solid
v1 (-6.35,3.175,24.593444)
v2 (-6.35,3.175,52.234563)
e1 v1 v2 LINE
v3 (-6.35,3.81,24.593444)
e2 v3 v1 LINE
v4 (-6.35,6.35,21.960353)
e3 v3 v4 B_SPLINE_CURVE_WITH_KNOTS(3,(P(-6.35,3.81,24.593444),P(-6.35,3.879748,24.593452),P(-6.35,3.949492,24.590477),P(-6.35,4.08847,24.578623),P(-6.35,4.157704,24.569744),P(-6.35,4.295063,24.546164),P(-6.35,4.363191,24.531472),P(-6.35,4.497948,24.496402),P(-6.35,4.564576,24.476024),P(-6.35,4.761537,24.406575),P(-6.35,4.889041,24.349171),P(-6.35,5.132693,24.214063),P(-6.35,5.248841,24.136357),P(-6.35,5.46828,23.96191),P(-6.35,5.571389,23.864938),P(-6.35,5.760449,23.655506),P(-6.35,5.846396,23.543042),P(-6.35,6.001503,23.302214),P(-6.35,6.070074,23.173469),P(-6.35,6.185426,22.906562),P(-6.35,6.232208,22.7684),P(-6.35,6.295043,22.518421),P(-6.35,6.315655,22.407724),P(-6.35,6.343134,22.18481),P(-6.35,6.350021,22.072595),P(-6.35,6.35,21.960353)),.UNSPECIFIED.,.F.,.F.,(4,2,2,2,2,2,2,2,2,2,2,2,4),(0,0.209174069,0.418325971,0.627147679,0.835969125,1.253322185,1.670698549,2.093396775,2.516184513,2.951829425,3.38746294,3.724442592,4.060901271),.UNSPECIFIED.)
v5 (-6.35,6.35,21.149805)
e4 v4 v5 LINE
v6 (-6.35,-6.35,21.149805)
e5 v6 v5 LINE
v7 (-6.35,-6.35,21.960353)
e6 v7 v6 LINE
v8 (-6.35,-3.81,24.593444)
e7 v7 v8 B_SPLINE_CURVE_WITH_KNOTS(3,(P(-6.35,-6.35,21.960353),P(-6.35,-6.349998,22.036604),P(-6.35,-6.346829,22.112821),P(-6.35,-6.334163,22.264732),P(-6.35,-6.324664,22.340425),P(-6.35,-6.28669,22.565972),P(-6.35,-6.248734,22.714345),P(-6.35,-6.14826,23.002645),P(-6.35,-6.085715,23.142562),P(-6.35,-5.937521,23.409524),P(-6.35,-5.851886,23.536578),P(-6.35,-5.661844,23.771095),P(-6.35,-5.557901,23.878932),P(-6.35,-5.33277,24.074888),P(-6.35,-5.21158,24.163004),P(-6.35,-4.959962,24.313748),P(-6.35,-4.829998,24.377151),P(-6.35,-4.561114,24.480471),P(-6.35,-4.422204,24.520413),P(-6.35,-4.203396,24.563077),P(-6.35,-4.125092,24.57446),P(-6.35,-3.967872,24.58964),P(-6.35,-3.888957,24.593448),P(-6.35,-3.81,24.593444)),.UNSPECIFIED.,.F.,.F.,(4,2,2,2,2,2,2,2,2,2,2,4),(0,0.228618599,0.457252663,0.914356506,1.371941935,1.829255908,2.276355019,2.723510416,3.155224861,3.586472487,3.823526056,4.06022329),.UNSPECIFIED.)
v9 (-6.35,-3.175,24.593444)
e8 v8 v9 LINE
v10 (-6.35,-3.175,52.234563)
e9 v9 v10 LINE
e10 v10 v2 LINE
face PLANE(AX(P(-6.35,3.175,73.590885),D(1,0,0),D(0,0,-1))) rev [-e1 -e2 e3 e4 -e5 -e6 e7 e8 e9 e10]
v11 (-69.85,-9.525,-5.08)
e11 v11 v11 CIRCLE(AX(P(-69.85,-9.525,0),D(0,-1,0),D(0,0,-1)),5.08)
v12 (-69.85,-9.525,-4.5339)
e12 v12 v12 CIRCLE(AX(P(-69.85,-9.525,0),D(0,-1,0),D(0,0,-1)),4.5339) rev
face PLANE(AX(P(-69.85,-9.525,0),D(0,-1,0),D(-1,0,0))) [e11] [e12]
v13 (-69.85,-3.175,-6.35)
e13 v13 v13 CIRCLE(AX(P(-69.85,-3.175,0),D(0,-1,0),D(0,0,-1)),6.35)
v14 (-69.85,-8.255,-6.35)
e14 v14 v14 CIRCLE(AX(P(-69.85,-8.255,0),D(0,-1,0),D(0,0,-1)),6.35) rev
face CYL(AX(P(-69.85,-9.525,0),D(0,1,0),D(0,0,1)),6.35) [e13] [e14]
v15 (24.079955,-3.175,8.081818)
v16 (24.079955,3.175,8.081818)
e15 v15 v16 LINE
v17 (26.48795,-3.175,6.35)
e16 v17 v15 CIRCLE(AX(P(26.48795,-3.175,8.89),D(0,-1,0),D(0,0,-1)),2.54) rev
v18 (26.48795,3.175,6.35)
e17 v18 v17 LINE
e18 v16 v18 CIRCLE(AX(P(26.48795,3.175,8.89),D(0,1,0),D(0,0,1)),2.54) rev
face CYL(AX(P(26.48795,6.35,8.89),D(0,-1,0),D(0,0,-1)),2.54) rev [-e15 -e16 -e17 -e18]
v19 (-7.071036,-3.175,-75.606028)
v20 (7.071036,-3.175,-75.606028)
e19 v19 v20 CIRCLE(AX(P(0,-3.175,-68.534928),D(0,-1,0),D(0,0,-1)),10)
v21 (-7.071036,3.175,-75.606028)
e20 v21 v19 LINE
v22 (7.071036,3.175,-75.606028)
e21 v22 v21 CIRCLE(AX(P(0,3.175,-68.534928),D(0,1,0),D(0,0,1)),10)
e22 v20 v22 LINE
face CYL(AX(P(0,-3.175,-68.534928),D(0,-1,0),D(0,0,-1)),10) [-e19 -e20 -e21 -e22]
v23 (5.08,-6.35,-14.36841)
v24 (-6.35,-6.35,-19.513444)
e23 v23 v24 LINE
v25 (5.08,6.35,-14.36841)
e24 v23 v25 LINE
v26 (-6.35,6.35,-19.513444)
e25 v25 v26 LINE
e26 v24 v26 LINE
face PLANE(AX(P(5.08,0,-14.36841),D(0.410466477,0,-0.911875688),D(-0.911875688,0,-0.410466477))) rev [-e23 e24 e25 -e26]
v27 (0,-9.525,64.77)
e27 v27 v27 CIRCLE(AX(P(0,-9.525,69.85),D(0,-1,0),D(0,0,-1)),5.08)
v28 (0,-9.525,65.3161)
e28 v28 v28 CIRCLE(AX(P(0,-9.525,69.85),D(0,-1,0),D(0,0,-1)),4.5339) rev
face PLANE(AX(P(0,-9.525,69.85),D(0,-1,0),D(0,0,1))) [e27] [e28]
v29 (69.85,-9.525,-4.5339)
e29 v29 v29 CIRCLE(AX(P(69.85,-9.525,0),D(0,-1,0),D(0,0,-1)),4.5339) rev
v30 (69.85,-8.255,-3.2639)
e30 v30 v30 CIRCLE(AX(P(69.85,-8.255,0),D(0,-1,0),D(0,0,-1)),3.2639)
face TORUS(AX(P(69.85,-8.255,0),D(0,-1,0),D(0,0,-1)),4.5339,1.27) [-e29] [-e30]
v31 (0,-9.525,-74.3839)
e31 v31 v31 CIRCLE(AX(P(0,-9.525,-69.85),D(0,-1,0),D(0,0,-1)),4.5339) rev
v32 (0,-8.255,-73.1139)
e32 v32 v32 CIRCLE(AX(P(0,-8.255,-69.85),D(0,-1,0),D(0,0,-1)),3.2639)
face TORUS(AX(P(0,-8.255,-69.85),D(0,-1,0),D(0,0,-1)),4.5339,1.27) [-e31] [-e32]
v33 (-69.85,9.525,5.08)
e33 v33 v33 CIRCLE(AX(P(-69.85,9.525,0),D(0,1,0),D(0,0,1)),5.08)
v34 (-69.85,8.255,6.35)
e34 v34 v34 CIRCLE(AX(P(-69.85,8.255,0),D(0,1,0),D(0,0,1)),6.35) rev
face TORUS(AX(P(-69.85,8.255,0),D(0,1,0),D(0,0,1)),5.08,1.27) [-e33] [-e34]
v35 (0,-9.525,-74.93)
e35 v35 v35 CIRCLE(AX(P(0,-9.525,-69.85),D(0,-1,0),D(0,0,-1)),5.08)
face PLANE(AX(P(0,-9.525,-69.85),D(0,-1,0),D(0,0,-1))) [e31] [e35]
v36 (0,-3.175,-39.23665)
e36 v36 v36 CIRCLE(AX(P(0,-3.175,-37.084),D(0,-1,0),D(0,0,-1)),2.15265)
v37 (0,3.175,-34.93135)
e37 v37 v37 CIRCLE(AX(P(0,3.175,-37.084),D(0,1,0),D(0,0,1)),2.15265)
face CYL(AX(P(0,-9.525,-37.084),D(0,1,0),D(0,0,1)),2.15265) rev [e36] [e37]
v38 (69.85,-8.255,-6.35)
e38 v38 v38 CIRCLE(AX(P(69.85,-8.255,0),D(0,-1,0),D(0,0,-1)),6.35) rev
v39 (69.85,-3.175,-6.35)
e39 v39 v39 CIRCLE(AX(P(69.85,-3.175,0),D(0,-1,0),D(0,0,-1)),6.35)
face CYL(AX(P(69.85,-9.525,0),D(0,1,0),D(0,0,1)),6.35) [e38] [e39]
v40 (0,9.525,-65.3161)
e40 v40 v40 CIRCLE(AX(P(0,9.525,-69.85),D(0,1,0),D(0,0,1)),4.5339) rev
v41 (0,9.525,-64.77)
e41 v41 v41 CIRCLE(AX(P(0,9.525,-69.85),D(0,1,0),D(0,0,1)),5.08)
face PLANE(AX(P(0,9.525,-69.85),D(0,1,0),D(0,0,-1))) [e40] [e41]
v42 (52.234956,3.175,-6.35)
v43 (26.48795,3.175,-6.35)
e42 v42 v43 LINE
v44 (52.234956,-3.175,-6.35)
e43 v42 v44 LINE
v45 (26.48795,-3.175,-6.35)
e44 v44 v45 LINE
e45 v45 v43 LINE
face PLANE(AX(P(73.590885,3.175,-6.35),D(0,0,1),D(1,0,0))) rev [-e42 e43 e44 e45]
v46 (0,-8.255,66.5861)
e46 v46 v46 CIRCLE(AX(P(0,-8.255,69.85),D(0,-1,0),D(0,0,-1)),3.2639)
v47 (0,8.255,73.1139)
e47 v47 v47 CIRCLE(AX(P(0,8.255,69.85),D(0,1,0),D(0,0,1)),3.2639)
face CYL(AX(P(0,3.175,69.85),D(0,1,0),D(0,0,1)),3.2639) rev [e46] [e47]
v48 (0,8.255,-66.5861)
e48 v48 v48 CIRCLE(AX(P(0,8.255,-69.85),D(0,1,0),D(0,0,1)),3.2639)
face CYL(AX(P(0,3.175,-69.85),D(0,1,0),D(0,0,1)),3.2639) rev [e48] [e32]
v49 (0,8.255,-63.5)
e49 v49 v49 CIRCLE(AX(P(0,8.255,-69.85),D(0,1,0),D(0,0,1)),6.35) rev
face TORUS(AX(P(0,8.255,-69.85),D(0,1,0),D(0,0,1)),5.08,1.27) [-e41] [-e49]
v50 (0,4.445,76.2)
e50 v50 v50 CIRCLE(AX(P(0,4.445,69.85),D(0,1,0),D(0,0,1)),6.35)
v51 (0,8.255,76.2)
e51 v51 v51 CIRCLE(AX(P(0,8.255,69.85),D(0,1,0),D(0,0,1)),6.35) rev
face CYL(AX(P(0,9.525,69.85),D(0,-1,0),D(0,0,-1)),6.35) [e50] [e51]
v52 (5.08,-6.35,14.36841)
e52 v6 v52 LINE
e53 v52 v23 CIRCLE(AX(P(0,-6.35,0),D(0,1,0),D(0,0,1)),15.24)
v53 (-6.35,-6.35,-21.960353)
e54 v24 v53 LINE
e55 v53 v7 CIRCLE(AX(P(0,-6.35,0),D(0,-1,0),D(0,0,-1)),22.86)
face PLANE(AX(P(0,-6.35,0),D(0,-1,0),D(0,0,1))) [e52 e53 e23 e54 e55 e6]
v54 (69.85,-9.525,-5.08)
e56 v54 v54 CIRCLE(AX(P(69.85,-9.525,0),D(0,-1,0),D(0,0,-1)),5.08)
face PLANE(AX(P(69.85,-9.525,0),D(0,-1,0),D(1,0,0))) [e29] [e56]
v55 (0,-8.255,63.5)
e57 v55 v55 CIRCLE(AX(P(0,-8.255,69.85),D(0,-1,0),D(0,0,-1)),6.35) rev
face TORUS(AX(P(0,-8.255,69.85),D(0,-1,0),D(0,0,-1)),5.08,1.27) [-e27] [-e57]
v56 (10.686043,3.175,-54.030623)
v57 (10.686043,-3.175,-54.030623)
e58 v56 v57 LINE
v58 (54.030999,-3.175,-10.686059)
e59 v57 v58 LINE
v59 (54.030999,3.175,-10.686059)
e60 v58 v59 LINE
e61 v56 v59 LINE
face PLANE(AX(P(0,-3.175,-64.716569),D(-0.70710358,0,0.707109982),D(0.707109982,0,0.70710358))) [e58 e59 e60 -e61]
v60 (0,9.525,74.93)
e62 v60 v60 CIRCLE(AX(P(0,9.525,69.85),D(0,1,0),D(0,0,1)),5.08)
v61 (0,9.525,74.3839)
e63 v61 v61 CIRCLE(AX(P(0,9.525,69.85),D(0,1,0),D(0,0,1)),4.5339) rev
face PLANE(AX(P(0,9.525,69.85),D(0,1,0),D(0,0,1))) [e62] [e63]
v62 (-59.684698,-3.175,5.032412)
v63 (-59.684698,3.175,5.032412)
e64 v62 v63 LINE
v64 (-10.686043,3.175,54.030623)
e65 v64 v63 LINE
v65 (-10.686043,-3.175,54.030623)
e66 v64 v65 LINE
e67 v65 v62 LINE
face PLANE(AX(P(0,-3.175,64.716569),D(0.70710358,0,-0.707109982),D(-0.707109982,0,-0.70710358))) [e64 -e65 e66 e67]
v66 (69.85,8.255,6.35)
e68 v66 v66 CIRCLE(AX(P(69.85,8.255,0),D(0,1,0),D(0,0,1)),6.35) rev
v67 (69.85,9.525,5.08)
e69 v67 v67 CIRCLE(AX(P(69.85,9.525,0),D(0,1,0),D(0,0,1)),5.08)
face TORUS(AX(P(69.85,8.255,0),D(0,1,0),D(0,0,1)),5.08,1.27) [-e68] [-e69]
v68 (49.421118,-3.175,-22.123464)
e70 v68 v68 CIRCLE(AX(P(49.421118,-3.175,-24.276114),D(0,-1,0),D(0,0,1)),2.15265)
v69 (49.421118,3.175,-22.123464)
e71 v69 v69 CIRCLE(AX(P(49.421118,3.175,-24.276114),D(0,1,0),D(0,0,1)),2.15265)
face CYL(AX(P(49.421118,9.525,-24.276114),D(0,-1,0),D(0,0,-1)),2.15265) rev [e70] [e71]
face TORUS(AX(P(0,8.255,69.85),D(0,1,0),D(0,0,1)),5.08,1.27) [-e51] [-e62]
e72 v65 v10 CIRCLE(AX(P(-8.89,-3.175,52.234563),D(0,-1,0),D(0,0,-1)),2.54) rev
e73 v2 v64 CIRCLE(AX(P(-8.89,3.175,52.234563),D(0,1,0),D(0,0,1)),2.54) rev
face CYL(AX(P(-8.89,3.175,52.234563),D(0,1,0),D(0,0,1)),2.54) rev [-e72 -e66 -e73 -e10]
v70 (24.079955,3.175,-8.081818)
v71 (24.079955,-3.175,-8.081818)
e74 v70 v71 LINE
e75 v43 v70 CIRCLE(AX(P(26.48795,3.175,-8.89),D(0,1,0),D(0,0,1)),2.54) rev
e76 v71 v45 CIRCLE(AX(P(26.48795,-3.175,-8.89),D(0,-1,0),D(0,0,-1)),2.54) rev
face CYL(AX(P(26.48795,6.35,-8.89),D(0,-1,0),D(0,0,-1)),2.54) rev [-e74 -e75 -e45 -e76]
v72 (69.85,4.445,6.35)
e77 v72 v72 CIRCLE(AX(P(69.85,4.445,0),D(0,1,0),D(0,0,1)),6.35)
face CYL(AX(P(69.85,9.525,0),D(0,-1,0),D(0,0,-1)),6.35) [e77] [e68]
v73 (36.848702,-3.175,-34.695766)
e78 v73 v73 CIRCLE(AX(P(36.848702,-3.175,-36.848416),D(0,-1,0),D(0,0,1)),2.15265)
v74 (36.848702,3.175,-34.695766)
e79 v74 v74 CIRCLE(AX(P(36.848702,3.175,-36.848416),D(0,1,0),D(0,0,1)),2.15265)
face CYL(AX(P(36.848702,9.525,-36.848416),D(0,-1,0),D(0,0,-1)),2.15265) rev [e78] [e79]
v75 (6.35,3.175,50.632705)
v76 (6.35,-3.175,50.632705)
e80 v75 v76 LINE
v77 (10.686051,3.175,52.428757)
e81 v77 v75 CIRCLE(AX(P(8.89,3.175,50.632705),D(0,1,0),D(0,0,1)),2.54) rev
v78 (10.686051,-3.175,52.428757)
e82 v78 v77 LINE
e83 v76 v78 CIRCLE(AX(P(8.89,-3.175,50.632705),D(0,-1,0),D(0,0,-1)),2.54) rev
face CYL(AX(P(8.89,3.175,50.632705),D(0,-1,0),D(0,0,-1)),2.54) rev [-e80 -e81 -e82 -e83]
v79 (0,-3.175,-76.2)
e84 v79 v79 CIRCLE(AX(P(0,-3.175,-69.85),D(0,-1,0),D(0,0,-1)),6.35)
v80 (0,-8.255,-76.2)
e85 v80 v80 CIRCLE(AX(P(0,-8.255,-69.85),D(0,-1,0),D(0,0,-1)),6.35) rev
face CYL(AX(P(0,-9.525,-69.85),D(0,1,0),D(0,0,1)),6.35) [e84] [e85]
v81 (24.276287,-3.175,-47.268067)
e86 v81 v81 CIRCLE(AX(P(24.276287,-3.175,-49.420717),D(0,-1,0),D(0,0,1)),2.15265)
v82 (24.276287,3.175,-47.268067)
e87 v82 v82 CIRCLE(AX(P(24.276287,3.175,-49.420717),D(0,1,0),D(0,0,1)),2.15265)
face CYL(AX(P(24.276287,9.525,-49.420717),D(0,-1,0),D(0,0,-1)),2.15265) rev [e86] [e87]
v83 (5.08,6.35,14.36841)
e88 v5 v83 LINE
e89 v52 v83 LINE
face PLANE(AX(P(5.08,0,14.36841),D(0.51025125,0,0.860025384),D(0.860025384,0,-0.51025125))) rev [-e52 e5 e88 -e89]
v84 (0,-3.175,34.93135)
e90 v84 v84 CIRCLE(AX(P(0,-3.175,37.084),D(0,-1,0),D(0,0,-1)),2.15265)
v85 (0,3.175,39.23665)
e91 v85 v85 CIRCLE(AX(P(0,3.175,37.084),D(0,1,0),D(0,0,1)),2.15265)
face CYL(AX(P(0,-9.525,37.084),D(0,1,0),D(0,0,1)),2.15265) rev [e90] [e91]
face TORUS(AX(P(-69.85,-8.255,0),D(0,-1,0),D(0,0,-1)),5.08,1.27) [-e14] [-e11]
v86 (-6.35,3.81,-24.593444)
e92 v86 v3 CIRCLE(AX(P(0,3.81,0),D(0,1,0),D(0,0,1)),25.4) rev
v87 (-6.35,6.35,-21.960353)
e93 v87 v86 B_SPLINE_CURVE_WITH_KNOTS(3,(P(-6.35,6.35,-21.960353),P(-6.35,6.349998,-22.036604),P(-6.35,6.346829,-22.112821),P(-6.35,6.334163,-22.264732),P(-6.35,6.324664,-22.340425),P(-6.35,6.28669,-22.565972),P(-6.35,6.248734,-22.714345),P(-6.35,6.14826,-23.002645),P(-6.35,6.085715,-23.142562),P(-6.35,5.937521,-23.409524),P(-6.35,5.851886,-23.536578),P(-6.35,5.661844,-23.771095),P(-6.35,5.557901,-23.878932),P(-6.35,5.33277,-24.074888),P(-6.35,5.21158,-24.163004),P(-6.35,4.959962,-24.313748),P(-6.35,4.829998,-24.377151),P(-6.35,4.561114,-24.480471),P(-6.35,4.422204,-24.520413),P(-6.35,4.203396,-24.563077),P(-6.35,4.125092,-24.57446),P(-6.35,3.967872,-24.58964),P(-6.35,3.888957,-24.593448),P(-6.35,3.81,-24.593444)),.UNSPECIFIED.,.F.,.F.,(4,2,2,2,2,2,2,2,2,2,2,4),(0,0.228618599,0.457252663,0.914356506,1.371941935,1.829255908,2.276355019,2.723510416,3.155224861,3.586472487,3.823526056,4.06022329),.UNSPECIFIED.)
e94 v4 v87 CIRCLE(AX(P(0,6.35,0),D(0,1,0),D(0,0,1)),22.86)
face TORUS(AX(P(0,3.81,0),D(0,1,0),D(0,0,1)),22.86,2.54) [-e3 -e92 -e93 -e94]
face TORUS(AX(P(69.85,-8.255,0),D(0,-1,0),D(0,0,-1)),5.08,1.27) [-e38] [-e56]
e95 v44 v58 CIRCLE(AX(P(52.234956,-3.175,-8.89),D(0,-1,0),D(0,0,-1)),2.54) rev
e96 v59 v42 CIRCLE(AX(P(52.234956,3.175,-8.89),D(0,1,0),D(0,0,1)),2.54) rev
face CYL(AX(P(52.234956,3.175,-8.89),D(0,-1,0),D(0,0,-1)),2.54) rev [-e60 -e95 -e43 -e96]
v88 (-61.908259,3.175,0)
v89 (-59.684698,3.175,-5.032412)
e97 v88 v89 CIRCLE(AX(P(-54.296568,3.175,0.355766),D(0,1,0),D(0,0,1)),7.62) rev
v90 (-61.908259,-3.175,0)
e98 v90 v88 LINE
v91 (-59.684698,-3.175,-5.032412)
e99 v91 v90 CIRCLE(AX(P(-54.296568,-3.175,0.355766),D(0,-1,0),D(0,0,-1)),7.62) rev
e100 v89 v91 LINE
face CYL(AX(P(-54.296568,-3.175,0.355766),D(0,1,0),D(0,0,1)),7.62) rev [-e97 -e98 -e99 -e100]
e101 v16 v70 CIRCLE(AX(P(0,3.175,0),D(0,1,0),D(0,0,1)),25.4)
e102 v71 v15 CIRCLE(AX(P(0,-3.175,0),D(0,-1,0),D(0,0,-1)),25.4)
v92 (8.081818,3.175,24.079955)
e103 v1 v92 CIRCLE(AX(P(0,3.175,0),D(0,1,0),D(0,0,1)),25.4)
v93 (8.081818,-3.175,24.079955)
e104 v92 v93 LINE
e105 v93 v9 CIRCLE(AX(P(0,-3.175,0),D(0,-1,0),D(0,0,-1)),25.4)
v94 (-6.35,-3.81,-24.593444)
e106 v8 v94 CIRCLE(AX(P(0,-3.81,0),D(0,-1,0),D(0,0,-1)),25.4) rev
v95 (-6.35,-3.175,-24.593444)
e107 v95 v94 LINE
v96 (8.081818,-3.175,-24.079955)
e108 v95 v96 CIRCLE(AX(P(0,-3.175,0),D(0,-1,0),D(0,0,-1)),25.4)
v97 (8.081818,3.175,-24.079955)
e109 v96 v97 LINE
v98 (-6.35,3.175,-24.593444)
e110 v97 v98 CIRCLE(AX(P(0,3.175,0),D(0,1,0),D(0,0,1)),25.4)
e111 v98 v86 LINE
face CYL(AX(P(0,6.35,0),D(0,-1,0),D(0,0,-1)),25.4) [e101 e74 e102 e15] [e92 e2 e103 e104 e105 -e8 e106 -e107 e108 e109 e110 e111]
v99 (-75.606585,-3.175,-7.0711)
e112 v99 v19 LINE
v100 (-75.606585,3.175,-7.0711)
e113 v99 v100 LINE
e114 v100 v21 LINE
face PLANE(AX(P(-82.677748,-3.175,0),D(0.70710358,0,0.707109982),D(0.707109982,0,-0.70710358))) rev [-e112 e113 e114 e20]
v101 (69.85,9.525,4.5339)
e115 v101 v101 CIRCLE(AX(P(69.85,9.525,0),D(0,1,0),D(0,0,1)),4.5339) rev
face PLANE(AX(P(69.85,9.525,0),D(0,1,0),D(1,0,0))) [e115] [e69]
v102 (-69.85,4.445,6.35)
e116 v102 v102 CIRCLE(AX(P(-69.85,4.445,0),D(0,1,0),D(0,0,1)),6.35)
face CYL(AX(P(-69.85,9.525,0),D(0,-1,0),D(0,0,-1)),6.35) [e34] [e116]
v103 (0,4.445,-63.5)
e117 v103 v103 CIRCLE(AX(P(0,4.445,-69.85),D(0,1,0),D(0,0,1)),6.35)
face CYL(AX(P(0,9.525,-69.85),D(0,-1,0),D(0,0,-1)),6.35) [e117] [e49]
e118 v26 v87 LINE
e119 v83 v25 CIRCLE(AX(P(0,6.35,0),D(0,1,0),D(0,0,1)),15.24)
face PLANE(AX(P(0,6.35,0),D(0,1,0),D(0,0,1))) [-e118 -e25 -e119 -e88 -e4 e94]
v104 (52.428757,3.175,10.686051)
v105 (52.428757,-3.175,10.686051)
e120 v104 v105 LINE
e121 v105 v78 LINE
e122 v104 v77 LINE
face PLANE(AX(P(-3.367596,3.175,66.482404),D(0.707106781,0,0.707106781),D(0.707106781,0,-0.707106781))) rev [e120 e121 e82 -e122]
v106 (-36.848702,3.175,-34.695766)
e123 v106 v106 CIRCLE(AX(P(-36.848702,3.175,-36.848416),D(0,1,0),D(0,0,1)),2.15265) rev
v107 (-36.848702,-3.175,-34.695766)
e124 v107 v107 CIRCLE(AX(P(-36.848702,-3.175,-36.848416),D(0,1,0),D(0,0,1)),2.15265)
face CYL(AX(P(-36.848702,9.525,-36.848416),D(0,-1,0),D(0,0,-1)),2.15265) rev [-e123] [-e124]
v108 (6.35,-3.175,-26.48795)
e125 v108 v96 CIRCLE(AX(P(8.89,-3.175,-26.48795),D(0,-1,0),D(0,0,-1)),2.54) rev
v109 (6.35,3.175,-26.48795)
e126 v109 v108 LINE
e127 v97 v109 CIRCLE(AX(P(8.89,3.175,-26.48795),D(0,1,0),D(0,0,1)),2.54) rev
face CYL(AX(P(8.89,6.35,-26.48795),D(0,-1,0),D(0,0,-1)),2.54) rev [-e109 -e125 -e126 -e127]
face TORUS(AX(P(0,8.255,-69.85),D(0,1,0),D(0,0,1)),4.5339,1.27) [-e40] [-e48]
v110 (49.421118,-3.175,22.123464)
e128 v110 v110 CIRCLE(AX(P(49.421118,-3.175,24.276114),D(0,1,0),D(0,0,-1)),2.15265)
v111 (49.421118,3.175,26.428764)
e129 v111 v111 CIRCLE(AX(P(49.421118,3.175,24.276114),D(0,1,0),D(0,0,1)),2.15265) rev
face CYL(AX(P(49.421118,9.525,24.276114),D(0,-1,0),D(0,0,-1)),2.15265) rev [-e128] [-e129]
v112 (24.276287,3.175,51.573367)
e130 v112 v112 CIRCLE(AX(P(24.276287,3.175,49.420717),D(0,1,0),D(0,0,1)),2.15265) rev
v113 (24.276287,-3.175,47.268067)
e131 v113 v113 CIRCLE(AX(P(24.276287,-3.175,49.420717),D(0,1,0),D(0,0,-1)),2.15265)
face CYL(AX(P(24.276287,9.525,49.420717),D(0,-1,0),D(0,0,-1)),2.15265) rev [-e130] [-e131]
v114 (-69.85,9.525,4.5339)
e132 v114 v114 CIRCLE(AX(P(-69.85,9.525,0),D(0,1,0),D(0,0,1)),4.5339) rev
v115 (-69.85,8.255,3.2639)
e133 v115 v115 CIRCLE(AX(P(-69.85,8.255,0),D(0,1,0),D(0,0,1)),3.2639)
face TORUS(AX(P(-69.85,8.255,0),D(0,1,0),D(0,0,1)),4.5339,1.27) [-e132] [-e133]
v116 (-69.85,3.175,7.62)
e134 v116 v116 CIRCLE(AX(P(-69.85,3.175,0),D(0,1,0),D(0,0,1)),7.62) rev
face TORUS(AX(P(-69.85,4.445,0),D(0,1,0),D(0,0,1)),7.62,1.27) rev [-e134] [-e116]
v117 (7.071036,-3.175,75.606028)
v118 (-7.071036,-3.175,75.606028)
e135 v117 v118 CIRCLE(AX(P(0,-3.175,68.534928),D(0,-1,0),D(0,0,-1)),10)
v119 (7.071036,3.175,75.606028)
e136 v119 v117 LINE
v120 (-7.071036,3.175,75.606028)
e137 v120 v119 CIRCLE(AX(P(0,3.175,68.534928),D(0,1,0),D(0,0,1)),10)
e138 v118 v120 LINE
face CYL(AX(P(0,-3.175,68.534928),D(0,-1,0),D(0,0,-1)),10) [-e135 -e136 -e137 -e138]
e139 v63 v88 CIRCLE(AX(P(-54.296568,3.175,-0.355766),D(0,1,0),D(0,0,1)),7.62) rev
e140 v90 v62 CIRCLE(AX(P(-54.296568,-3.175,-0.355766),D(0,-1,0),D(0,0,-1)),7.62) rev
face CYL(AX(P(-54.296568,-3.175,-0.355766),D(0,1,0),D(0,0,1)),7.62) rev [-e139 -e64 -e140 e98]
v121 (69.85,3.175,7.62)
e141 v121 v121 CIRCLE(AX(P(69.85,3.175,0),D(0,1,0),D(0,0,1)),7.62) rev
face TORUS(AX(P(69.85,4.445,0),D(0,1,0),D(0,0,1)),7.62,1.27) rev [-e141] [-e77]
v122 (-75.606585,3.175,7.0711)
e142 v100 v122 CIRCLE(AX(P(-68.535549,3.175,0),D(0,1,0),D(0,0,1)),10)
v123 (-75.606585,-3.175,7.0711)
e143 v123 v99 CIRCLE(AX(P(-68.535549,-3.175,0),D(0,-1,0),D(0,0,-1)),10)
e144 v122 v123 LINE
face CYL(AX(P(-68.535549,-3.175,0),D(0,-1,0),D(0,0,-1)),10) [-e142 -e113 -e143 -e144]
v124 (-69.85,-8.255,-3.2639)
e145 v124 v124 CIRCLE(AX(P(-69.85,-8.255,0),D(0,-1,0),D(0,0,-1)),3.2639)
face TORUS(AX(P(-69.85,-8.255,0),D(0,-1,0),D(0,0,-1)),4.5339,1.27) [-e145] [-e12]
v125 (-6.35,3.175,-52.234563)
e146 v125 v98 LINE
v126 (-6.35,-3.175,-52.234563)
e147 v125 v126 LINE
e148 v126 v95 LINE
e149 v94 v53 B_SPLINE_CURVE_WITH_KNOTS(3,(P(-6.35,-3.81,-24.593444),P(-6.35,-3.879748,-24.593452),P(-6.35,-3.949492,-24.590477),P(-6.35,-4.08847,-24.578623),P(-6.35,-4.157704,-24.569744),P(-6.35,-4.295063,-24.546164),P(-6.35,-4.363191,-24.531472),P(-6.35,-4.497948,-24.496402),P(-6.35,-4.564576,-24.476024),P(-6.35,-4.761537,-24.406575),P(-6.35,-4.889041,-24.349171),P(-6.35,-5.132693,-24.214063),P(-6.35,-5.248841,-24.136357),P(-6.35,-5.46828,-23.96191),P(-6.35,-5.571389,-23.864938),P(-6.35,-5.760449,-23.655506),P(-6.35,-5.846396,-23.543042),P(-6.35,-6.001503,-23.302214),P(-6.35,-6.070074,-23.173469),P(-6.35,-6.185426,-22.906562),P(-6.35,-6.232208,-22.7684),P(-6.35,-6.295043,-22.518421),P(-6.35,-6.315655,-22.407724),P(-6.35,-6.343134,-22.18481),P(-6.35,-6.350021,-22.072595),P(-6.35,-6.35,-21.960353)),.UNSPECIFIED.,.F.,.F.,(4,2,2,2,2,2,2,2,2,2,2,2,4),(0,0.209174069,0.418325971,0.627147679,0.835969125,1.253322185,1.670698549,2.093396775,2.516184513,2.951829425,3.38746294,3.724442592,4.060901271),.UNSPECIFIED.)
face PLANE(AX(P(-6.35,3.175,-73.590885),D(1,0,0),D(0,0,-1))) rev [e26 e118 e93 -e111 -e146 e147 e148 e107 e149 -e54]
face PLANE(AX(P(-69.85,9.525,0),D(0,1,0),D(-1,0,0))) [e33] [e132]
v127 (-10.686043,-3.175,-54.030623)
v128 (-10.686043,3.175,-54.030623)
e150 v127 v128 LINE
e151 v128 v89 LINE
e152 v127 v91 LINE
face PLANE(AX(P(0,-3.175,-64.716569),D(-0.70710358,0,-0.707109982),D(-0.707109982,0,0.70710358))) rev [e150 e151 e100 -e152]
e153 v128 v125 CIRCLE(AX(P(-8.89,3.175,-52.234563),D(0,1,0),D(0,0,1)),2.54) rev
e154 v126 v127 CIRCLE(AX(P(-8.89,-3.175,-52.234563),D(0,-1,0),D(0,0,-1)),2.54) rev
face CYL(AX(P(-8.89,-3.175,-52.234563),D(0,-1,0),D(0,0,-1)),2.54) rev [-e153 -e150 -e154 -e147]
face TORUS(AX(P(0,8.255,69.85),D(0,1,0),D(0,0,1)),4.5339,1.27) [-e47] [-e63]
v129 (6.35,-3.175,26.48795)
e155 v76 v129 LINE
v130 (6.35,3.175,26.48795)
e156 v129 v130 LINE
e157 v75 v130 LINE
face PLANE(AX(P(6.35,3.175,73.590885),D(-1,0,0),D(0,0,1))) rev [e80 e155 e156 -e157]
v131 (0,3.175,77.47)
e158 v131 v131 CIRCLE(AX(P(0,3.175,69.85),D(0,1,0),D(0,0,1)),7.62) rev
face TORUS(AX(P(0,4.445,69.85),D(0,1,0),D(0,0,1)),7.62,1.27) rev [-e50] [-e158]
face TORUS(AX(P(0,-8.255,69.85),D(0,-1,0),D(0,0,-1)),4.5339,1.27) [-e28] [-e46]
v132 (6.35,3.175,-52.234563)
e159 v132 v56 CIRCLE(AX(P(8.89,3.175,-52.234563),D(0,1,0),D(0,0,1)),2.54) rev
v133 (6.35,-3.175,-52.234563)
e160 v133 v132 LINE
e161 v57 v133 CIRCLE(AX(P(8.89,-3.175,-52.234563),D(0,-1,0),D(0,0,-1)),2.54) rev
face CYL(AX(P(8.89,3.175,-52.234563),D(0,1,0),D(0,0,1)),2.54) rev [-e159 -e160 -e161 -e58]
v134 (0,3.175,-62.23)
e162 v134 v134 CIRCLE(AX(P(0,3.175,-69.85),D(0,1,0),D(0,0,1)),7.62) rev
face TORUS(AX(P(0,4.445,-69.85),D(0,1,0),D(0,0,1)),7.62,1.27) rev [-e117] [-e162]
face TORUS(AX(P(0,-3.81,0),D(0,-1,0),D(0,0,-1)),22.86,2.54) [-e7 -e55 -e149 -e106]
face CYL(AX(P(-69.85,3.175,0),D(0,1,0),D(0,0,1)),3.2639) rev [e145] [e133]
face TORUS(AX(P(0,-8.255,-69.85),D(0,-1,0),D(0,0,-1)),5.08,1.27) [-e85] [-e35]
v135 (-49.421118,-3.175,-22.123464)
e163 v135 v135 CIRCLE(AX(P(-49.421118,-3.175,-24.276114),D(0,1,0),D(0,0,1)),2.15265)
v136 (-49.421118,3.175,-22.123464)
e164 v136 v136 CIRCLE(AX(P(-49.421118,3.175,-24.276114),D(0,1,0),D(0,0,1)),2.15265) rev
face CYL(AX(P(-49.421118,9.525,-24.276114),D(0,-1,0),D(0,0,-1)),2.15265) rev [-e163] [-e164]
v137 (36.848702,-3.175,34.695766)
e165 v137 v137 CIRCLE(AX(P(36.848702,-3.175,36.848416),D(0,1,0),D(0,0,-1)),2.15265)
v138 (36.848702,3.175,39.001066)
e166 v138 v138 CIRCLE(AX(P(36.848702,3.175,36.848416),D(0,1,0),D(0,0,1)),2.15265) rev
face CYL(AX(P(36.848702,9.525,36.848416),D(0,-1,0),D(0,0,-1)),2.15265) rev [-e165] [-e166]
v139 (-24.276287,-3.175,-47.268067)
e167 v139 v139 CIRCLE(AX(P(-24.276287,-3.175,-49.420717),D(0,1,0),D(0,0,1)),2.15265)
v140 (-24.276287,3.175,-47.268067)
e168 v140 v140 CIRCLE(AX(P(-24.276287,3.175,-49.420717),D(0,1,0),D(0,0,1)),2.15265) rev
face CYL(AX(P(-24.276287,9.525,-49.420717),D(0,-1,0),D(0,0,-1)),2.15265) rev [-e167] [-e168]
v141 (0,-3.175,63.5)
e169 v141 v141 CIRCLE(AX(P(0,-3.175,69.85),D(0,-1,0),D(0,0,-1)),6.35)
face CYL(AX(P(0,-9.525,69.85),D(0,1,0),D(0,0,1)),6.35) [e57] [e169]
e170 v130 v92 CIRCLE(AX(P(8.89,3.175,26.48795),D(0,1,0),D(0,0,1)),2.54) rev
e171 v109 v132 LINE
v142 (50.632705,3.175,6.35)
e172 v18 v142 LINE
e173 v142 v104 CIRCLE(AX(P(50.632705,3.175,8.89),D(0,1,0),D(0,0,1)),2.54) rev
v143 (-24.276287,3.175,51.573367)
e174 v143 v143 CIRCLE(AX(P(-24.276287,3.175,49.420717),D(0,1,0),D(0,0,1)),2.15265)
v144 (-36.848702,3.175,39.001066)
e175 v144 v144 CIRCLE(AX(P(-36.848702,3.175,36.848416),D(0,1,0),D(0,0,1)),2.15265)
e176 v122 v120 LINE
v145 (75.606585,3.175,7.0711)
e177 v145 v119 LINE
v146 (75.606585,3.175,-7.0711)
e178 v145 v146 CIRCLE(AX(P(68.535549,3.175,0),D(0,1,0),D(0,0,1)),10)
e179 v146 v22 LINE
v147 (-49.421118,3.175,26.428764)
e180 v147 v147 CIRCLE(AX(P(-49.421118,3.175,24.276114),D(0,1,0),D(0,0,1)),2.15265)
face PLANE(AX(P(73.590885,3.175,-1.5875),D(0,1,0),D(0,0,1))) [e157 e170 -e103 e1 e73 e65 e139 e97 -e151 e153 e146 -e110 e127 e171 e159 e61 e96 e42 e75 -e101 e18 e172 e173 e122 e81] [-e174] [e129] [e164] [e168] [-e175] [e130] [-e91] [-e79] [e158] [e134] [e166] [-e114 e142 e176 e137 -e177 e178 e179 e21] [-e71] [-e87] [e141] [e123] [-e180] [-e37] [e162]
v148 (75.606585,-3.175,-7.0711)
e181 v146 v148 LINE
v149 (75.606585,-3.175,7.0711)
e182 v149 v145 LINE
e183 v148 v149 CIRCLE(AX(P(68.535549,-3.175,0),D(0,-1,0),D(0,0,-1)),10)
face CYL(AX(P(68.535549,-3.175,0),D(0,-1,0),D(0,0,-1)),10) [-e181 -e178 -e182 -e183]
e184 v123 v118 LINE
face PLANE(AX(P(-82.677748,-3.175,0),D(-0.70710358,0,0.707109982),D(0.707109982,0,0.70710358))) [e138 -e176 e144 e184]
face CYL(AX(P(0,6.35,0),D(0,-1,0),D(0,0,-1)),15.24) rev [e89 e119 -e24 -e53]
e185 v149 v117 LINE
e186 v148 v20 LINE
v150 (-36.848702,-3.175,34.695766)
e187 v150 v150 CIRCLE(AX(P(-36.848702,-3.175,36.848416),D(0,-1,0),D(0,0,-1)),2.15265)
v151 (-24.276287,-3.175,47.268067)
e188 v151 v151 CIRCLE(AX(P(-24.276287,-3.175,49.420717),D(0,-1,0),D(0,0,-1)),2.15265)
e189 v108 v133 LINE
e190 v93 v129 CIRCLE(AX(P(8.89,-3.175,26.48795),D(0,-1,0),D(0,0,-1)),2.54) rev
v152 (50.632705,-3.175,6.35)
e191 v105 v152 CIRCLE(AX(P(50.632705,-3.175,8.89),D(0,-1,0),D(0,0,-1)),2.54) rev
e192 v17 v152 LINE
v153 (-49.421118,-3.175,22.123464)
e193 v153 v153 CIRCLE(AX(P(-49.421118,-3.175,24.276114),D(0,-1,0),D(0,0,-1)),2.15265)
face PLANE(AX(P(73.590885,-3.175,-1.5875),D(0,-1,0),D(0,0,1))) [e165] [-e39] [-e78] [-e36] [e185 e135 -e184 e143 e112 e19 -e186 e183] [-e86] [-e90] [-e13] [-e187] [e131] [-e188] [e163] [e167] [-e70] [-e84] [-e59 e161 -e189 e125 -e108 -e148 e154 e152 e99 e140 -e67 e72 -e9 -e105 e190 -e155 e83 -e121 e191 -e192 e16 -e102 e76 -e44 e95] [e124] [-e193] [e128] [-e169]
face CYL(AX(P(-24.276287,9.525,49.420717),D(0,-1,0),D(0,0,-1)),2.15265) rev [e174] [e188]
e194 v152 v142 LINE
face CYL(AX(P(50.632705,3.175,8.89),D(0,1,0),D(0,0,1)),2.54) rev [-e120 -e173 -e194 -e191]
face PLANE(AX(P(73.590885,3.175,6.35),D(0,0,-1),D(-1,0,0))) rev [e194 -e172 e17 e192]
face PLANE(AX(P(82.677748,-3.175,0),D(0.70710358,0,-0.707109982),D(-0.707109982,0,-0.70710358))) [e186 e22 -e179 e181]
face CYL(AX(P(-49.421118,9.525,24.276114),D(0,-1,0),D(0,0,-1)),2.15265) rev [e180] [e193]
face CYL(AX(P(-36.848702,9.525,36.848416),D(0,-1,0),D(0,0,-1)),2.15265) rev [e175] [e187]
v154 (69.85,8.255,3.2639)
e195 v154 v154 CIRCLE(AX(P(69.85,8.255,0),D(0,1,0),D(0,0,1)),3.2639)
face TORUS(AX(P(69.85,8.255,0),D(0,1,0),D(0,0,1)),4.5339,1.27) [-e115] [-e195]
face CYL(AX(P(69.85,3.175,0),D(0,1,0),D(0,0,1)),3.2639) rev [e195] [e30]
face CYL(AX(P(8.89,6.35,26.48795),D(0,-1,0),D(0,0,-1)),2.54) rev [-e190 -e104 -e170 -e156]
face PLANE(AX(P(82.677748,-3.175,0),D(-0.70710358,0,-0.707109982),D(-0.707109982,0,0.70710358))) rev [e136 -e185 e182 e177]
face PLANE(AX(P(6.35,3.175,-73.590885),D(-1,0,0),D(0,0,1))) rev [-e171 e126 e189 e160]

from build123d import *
from build123d.topology import SkipClean

# Parameters (mm, degrees)
SKETCH1_R                                  = 25.4
SKETCH1_R_2                                = 15.24
BOSS_EXTRUDE1_DEPTH                        = 6.35
BOSS_EXTRUDE2_START                        = -6.35
BOSS_EXTRUDE2_DEPTH                        = 3.175
CIRPATTERN1_COUNT                          = 4
CUT_EXTRUDE1_DEPTH                         = 111.990216985
BOSS_EXTRUDE5_DEPTH                        = 3.175
MIRROR1_START                              = -3.175
MIRROR1_DEPTH                              = 3.175
MIRROR1_START_2                            = -6.35
MIRROR1_2_DEPTH                            = 3.175
FILLET4_R                                  = 2.54
BOSS_EXTRUDE7_DEPTH                        = 6.35
SKETCH16_R                                 = 7.9375
BOSS_EXTRUDE8_DEPTH                        = 6.35
MIRROR5_AT_THE_SECOND_PLANE_COPY_1_DEPTH   = 6.35
BOSS_EXTRUDE10_START                       = 6.35
SKETCH20_R                                 = 6.35
SKETCH20_R_2                               = 3.2639
BOSS_EXTRUDE10_DEPTH                       = 6.35
CIRPATTERN5_COUNT                          = 4
FILLET6_R                                  = 10
FILLET7_R                                  = 2.54
SKETCH18_R                                 = 2.15265
CUT_EXTRUDE4_DEPTH                         = 112.789343907
MIRROR6_AT_THE_SECOND_PLANE_COPY_1_SKETC_R = 2.15265
MIRROR6_AT_THE_SECOND_PLANE_COPY_1_DEPTH   = 112.789343907
FILLET8_R                                  = 2.54
FILLET10_R                                 = 7.62
FILLET11_R                                 = 1.27
CIRPATTERN7_COUNT                          = 4
FILLET11_OF_CIRPATTERN7_R                  = 1.27
SKETCH21_R                                 = 2.15265
CUT_EXTRUDE5_DEPTH                         = 112.789343907


# Read off the part's stored shape, not the designer's step: Mirror1, Mirror8
with BuildPart() as part:
    # Sketch1 → Boss-Extrude1 (new body)
    with BuildSketch(Plane(origin=(0, 0, 0), x_dir=(1, 0, 0), z_dir=(0, 1, 0))):
        with Locations(Location((0, 0, 0), (0, 0, 270))):
            Circle(SKETCH1_R)
        with Locations(Location((0, 0, 0), (0, 0, 270))):
            Circle(SKETCH1_R_2, mode=Mode.SUBTRACT)
    extrude(amount=BOSS_EXTRUDE1_DEPTH)

    # Sketch2 → Boss-Extrude2 (add)
    with BuildSketch(Plane(origin=(0, 6.35, 0), x_dir=(1, 0, 0), z_dir=(0, 1, 0)).offset(BOSS_EXTRUDE2_START)):
        with BuildLine():
            Line((73.590884631, -6.35), (16.699754169, -6.35))
            Line((16.699754169, -6.35), (16.699754169, 6.35))
            Line((16.699754169, 6.35), (73.590884631, 6.35))
            ThreePointArc((73.590884631, 6.35), (76.958480677, 4.955096045), (78.353384631, 1.5875))
            Line((78.353384631, 1.5875), (78.353384631, -1.5875))
            ThreePointArc((78.353384631, -1.5875), (76.958480677, -4.955096045), (73.590884631, -6.35))
        make_face()
    boss_extrude2 = extrude(amount=BOSS_EXTRUDE2_DEPTH)

    # CirPattern1: Boss-Extrude2 ×4 about axis
    cirpattern1_axis = Axis((0, 0, 0), (0, 1, 0))
    for i in range(1, CIRPATTERN1_COUNT):
        add(boss_extrude2.rotate(cirpattern1_axis, i * 360 / CIRPATTERN1_COUNT))

    # Sketch5 → Cut-Extrude1 (cut, through all)
    with BuildSketch(Plane(origin=(0, 6.35, 0), x_dir=(1, 0, 0), z_dir=(0, 1, 0))):
        Polygon((-6.35, 19.513444248), (-6.35, 24.593444248), (-6.35, 52.536571615), (-88.152777481, 52.536571615), (-88.152777481, -52.536571615), (-6.35, -52.536571615), (-6.35, -26.229804731), (-6.35, -21.149804731), (5.08, -14.368409794), (5.08, 14.368409794), align=None)
    extrude(amount=-CUT_EXTRUDE1_DEPTH, mode=Mode.SUBTRACT)

    # Sketch12 → Boss-Extrude5 (add)
    with BuildSketch(Plane(origin=(0, 0, 0), x_dir=(1, 0, 0), z_dir=(0, 1, 0))):
        with BuildLine():
            Line((-3.367596045, -66.482403955), (66.482403955, 3.367596045))
            ThreePointArc((66.482403955, 3.367596045), (73.217596045, 3.367596045), (73.217596045, -3.367596045))
            Line((73.217596045, -3.367596045), (3.367596045, -73.217596045))
            ThreePointArc((3.367596045, -73.217596045), (-3.367596045, -73.217596045), (-3.367596045, -66.482403955))
        make_face()
    extrude(amount=BOSS_EXTRUDE5_DEPTH)

    # Mirror1 outline → Mirror1 (add)
    with BuildSketch(Plane(origin=(0, 0, 0), x_dir=(1, 0, 0), z_dir=(0, 1, 0)).offset(MIRROR1_START)):
        with BuildLine():
            Line((73.590884631, 6.35), (24.593444248, 6.35))
            ThreePointArc((24.593444248, 6.35), (17.960512242, 17.960512242), (6.35, 24.593444248))
            Line((6.35, 24.593444248), (6.35, 73.590884631))
            ThreePointArc((6.35, 73.590884631), (4.955096046, 76.958480677), (1.5875, 78.353384631))
            Line((1.5875, 78.353384631), (-1.5875, 78.353384631))
            ThreePointArc((-1.5875, 78.353384631), (-4.955096046, 76.958480677), (-6.35, 73.590884631))
            Line((-6.35, 73.590884631), (-6.35, 19.513444248))
            Line((-6.35, 19.513444248), (5.08, 14.368409794))
            ThreePointArc((5.08, 14.368409794), (15.24, 0), (5.08, -14.368409794))
            Line((5.08, -14.368409794), (-6.35, -21.149804731))
            Line((-6.35, -21.149804731), (-6.35, -73.590884631))
            ThreePointArc((-6.35, -73.590884631), (-4.955096046, -76.958480677), (-1.5875, -78.353384631))
            Line((-1.5875, -78.353384631), (1.5875, -78.353384631))
            ThreePointArc((1.5875, -78.353384631), (4.955096046, -76.958480677), (6.35, -73.590884631))
            Line((6.35, -73.590884631), (6.35, -70.235192091))
            Line((6.35, -70.235192091), (70.235192091, -6.35))
            Line((70.235192091, -6.35), (73.590884631, -6.35))
            ThreePointArc((73.590884631, -6.35), (76.958480677, -4.955096046), (78.353384631, -1.5875))
            Line((78.353384631, -1.5875), (78.353384631, 1.5875))
            ThreePointArc((78.353384631, 1.5875), (76.958480677, 4.955096046), (73.590884631, 6.35))
        make_face()
        with BuildLine():
            Line((24.593444248, -6.35), (56.764807909, -6.35))
            Line((56.764807909, -6.35), (6.35, -56.764807909))
            Line((6.35, -56.764807909), (6.35, -24.593444248))
            ThreePointArc((6.35, -24.593444248), (17.960512242, -17.960512242), (24.593444248, -6.35))
        make_face(mode=Mode.SUBTRACT)
    extrude(amount=MIRROR1_DEPTH)

    # Mirror1 2 outline → Mirror1 2 (add)
    with BuildSketch(Plane(origin=(0, 0, 0), x_dir=(1, 0, 0), z_dir=(0, 1, 0)).offset(MIRROR1_START_2)):
        with BuildLine():
            ThreePointArc((-6.35, -24.593444248), (25.4, 0), (-6.35, 24.593444248))
            Line((-6.35, 24.593444248), (-6.35, 19.513444248))
            Line((-6.35, 19.513444248), (5.08, 14.368409794))
            ThreePointArc((5.08, 14.368409794), (15.24, 0), (5.08, -14.368409794))
            Line((5.08, -14.368409794), (-6.35, -21.149804731))
            Line((-6.35, -21.149804731), (-6.35, -24.593444248))
        make_face()
    extrude(amount=MIRROR1_2_DEPTH)

    # Fillet4
    # the kernel refuses this fillet: 2.54 mm, written as the material it adds along each edge
    with BuildSketch(Plane(origin=(24.593444248, 3.175, -6.35), x_dir=(1, 0, 0), z_dir=(0, -1, 0)), Plane(origin=(6.35, 3.175, 24.593444248), x_dir=(0, 0, 1), z_dir=(0, -1, 0)), Plane(origin=(6.35, -3.175, -24.593444248), x_dir=(0, 0, -1), z_dir=(0, 1, 0))) as fillet4_piece_1:
        with BuildLine():
            CenterArc((1.894505842, -2.54), FILLET4_R, 90, 71.446995465)
            ThreePointArc((-0.513489621, -1.731818182), (-0.241344994, -0.870475186), (0, 0))
            Line((0, 0), (1.894505842, 0))
        make_face()
    extrude(amount=3.175)
    with BuildSketch(Plane(origin=(24.593444248, 3.175, 6.35), x_dir=(1, 0, 0), z_dir=(0, -1, 0)), Plane(origin=(6.35, 3.175, -24.593444248), x_dir=(0, 0, -1), z_dir=(0, -1, 0))) as fillet4_piece_2:
        with BuildLine():
            CenterArc((1.894505842, 2.54), FILLET4_R, 198.553004535, 71.446995465)
            ThreePointArc((-0.513489621, 1.731818182), (-0.241344994, 0.870475186), (0, 0))
            Line((0, 0), (1.894505842, 0))
        make_face()
    extrude(amount=3.175)
    with BuildSketch(Plane(origin=(6.35, -3.175, 24.593444248), x_dir=(0.9587440651387001, 0, -0.2842706765766038), z_dir=(0, 1, 0)), Plane(origin=(24.593444248, -3.175, -6.35), x_dir=(-0.2842706765766039, 0, -0.9587440651387), z_dir=(0, 1, 0))) as fillet4_piece_3:
        with BuildLine():
            CenterArc((1.896657468, -2.538393751), FILLET4_R, 92.037746175, 71.446995466)
            Line((-0.538552458, -1.816346233), (0, 0))
            ThreePointArc((0, 0), (0.903170223, -0.016062489), (1.806340446, 0))
        make_face()
    extrude(amount=3.175)
    with BuildSketch(Plane(origin=(24.593444248, -3.175, 6.35), x_dir=(-0.2842706765766016, 0, 0.9587440651387007), z_dir=(0, 1, 0))) as fillet4_piece_4:
        with BuildLine():
            CenterArc((1.896657468, 2.538393751), FILLET4_R, 196.515258359, 71.446995466)
            Line((-0.538552458, 1.816346233), (0, 0))
            ThreePointArc((0, 0), (0.903170223, 0.016062489), (1.806340446, 0))
        make_face()
    extrude(amount=3.175)

    # Sketch15 → Boss-Extrude7 (add)
    with SkipClean():  # the faces are left unmerged after this step: merging them gives an invalid solid
        with BuildSketch(Plane(origin=(0, 3.175, 0), x_dir=(1, 0, 0), z_dir=(0, 1, 0))):
            Polygon((-82.677748493, 0), (0, -82.677), (0, -64.716569057), (-64.71715495, 0), align=None)
        boss_extrude7 = extrude(amount=-BOSS_EXTRUDE7_DEPTH)

    # Sketch16 → Boss-Extrude8 (add)
    with SkipClean():  # the faces are left unmerged after this step: merging them gives an invalid solid
        with BuildSketch(Plane(origin=(0, 3.175, 0), x_dir=(1, 0, 0), z_dir=(0, 1, 0))):
            with Locations((-69.85, 0)):
                Circle(SKETCH16_R)
        extrude(amount=-BOSS_EXTRUDE8_DEPTH)

    # Mirror5: Boss-Extrude7 across plane
    with SkipClean():  # the faces are left unmerged after this step: merging them gives an invalid solid
        add(boss_extrude7.mirror(Plane(origin=(0, 0, 0), x_dir=(0, 0, 1), z_dir=(1, 0, 0))))

    # Mirror5 at the second plane: Boss-Extrude7 across plane
    with SkipClean():  # the faces are left unmerged after this step: merging them gives an invalid solid
        add(boss_extrude7.mirror(Plane.XY))

    # Mirror5 at the second plane copy 1 sketc → Mirror5 at the second plane copy 1 (add)
    with SkipClean():  # the faces are left unmerged after this step: merging them gives an invalid solid
        with BuildSketch(Plane(origin=(0, 3.175, 0), x_dir=(-1, 0, 0), z_dir=(0, 1, 0))):
            Polygon((-82.677748493, 0), (0, -82.677), (0, -64.716569057), (-64.71715495, 0), align=None)
        extrude(amount=-MIRROR5_AT_THE_SECOND_PLANE_COPY_1_DEPTH)

    # Sketch14 → F (0.257) Diameter Hole2 (revolve, cut)
    with SkipClean():  # the faces are left unmerged after this step: merging them gives an invalid solid
        with BuildSketch(Plane(origin=(0, 3.175, 69.85), x_dir=(0, 0, 1), z_dir=(1, 0, 0))):
            Polygon((0, 0), (0, 52.761148974), (3.2639, 50.8), (3.2639, 0), align=None)
        f_0_257_diameter_hole2 = revolve(axis=Axis((0, 9.525, 69.85), (0, -1, 0)), mode=Mode.SUBTRACT)

    # Sketch20 → Boss-Extrude10 (add)
    with SkipClean():  # the faces are left unmerged after this step: merging them gives an invalid solid
        with BuildSketch(Plane(origin=(0, 3.175, 0), x_dir=(1, 0, 0), z_dir=(0, 1, 0)).offset(BOSS_EXTRUDE10_START)):
            with Locations(Location((0, -69.85, 0), (0, 0, 270))):
                Circle(SKETCH20_R)
            with Locations(Location((0, -69.85, 0), (0, 0, 270))):
                Circle(SKETCH20_R_2, mode=Mode.SUBTRACT)
        boss_extrude10 = extrude(amount=-BOSS_EXTRUDE10_DEPTH)

    # CirPattern5: F (0.257) Diameter Hole2 ×4 about axis
    with SkipClean():  # the faces are left unmerged after this step: merging them gives an invalid solid
        cirpattern5_axis = Axis((0, 0, 0), (0, 1, 0))
        for i in range(1, CIRPATTERN5_COUNT):
            add(f_0_257_diameter_hole2.rotate(cirpattern5_axis, i * 360 / CIRPATTERN5_COUNT), mode=Mode.SUBTRACT)

    # Fillet6
    # the kernel refuses this fillet: 10 mm, written as the material it takes off along each edge
    with BuildSketch(Plane(origin=(0, 28.174773672, 82.677), x_dir=(0.7071099819596428, 0, -0.7071035803989637), z_dir=(0, -1, 0))) as fillet6_piece_1:
        with BuildLine():
            CenterArc((FILLET6_R * 0.999990946867, -FILLET6_R), FILLET6_R, 90, 89.999481291)
            Line((-FILLET6_R * 9.05309197351e-06, -FILLET6_R * 0.999990946826), (0, 0))
            Line((0, 0), (FILLET6_R * 0.999990946867, 0))
        make_face()
    extrude(amount=56.349547343, mode=Mode.SUBTRACT)
    with BuildSketch(Plane(origin=(-82.677748493, 28.17522633, 0), x_dir=(0.7071099819596426, 0, 0.7071035803989637), z_dir=(0, -1, 0)), Plane(origin=(82.677748493, 28.17522633, 0), x_dir=(-0.7071099819596426, 0, -0.7071035803989637), z_dir=(0, -1, 0))) as fillet6_piece_2:
        with BuildLine():
            CenterArc((FILLET6_R * 1.00000905321, -FILLET6_R), FILLET6_R, 90, 90.000518709)
            Line((FILLET6_R * 9.05325589292e-06, -FILLET6_R * 1.00000905317), (0, 0))
            Line((0, 0), (FILLET6_R * 1.00000905321, 0))
        make_face()
    extrude(amount=56.350452661, mode=Mode.SUBTRACT)
    with BuildSketch(Plane(origin=(0, 28.174773672, -82.677), x_dir=(0.7071099819596428, 0, 0.7071035803989637), z_dir=(0, -1, 0))) as fillet6_piece_3:
        with BuildLine():
            CenterArc((FILLET6_R * 0.999990946867, FILLET6_R), FILLET6_R, 180.000518709, 89.999481291)
            Line((-FILLET6_R * 9.05309197351e-06, FILLET6_R * 0.999990946826), (0, 0))
            Line((0, 0), (FILLET6_R * 0.999990946867, 0))
        make_face()
    extrude(amount=56.349547343, mode=Mode.SUBTRACT)

    # Fillet7
    fillet7_edges = [part.edges().sort_by_distance(p)[0] for p in [
        (25.4, 6.35, 0),
        (25.4, -6.35, 0),
    ]]
    fillet(fillet7_edges, radius=FILLET7_R)

    # Sketch18 → Cut-Extrude4 (cut, through all)
    with BuildSketch(Plane.XZ.offset(3.175)):
        with Locations(Location((-36.848702495, 36.84841563, 0), (0, 0, 270))):
            Circle(SKETCH18_R)
        with Locations(Location((-49.421117974, 24.27611397, 0), (0, 0, 270))):
            Circle(SKETCH18_R)
        with Locations(Location((-24.276287016, 49.420717289, 0), (0, 0, 270))):
            Circle(SKETCH18_R)
    cut_extrude4 = extrude(amount=-CUT_EXTRUDE4_DEPTH, mode=Mode.SUBTRACT)

    # Mirror6: Cut-Extrude4 across plane
    add(cut_extrude4.mirror(Plane(origin=(0, 0, 0), x_dir=(0, 0, 1), z_dir=(1, 0, 0))), mode=Mode.SUBTRACT)

    # Mirror6 at the second plane: Cut-Extrude4 across plane
    add(cut_extrude4.mirror(Plane.XY), mode=Mode.SUBTRACT)

    # Mirror6 at the second plane copy 1 sketc → Mirror6 at the second plane copy 1 (cut, through all)
    with BuildSketch(Plane(origin=(0, -3.175, 0), x_dir=(-1, 0, 0), z_dir=(0, -1, 0))):
        with Locations(Location((-36.848702495, 36.84841563, 0), (0, 0, 270))):
            Circle(MIRROR6_AT_THE_SECOND_PLANE_COPY_1_SKETC_R)
        with Locations(Location((-49.421117974, 24.27611397, 0), (0, 0, 270))):
            Circle(MIRROR6_AT_THE_SECOND_PLANE_COPY_1_SKETC_R)
        with Locations(Location((-24.276287016, 49.420717289, 0), (0, 0, 270))):
            Circle(MIRROR6_AT_THE_SECOND_PLANE_COPY_1_SKETC_R)
    extrude(amount=-MIRROR6_AT_THE_SECOND_PLANE_COPY_1_DEPTH, mode=Mode.SUBTRACT)

    # Fillet8
    fillet8_edges = [part.edges().sort_by_distance(p)[0] for p in [
        (56.764807909, 1.5875, 6.35),
        (6.35, 1.5875, 56.764807909),
        (-6.35, 0, 58.366626545),
        (-6.35, 0, -58.366626545),
        (58.367097462, 0, -6.35),
        (6.35, 0, -58.366626545),
    ]]
    fillet(fillet8_edges, radius=FILLET8_R)

    # Fillet10
    # the kernel refuses this fillet: 7.62 mm, written as the material it adds along each edge
    with BuildSketch(Plane(origin=(-62.292036451, -3.175, 2.425096544), x_dir=(0.14331424263929318, 0, -0.9896772341812888), z_dir=(0, 1, 0))) as fillet10_piece_1:
        with BuildLine():
            CenterArc((3.898021094, -7.514395522), FILLET10_R, 99.55001733, 43.689914902)
            Line((-2.206731735, -2.954089294), (0, 0))
            ThreePointArc((0, 0), (1.316899018, -0.110004665), (2.633798037, 0))
        make_face()
    extrude(amount=6.35)
    with BuildSketch(Plane(origin=(-62.292036451, -3.175, -2.425096544), x_dir=(0.7071099819596419, 0, -0.7071035803989645), z_dir=(0, 1, 0))) as fillet10_piece_2:
        with BuildLine():
            CenterArc((3.687317251, -7.62), FILLET10_R, 90, 43.689914902)
            ThreePointArc((-1.576236954, -2.110063782), (-0.699988387, -1.120865875), (0, 0))
            Line((0, 0), (3.687317251, 0))
        make_face()
    extrude(amount=6.35)

    # Fillet11
    fillet11_edges = [part.edges().sort_by_distance(p)[0] for p in [
        (0, 9.525, 63.5),
        (0, 3.175, 63.5),
        (0, 9.525, 66.5861),
    ]]
    fillet(fillet11_edges, radius=FILLET11_R)

    # CirPattern7: Boss-Extrude10 ×4 about axis
    cirpattern7_axis = Axis((0, 0, 0), (0, 1, 0))
    for i in range(1, CIRPATTERN7_COUNT):
        add(boss_extrude10.rotate(cirpattern7_axis, i * 360 / CIRPATTERN7_COUNT))

    # Fillet11 of CirPattern7
    fillet11_of_cirpattern7_edges = [part.edges().sort_by_distance(p)[0] for p in [
        (63.5, 9.525, 0),
        (63.5, 3.175, 0),
        (66.5861, 9.525, 0),
        (0, 9.525, -63.5),
        (0, 3.175, -63.5),
        (0, 9.525, -66.5861),
        (-63.5, 9.525, 0),
        (-63.5, 3.175, 0),
        (-66.5861, 9.525, 0),
    ]]
    fillet(fillet11_of_cirpattern7_edges, radius=FILLET11_OF_CIRPATTERN7_R)

    # Mirror8 outline → Mirror8 (revolve)
    with BuildSketch(Plane.XY.offset(69.85)):
        with BuildLine():
            Line((3.2639, -3.175), (3.2639, -8.255))
            ThreePointArc((3.2639, -8.255), (3.635874388, -9.153025612), (4.5339, -9.525))
            Line((4.5339, -9.525), (5.08, -9.525))
            ThreePointArc((5.08, -9.525), (5.978025612, -9.153025612), (6.35, -8.255))
            Line((6.35, -8.255), (6.35, -3.175))
            Line((6.35, -3.175), (3.2639, -3.175))
        make_face()
    revolve(axis=Axis((0, 0, 69.85), (0, 1, 0)))

    # Mirror8 2 outline → Mirror8 2 (revolve)
    with BuildSketch(Plane(origin=(69.85, 0, 0), x_dir=(1, 0, 0), z_dir=(0, 0, 1))):
        with BuildLine():
            Line((3.2639, -3.175), (3.2639, -8.255))
            ThreePointArc((3.2639, -8.255), (3.635874388, -9.153025612), (4.5339, -9.525))
            Line((4.5339, -9.525), (5.08, -9.525))
            ThreePointArc((5.08, -9.525), (5.978025612, -9.153025612), (6.35, -8.255))
            Line((6.35, -8.255), (6.35, -3.175))
            Line((6.35, -3.175), (3.2639, -3.175))
        make_face()
    revolve(axis=Axis((69.85, 0, 0), (0, 1, 0)))

    # Mirror8 3 outline → Mirror8 3 (revolve)
    with BuildSketch(Plane.XY.offset(-69.85)):
        with BuildLine():
            Line((3.2639, -3.175), (3.2639, -8.255))
            ThreePointArc((3.2639, -8.255), (3.635874388, -9.153025612), (4.5339, -9.525))
            Line((4.5339, -9.525), (5.08, -9.525))
            ThreePointArc((5.08, -9.525), (5.978025612, -9.153025612), (6.35, -8.255))
            Line((6.35, -8.255), (6.35, -3.175))
            Line((6.35, -3.175), (3.2639, -3.175))
        make_face()
    revolve(axis=Axis((0, 0, -69.85), (0, 1, 0)))

    # Mirror8 4 outline → Mirror8 4 (revolve)
    with BuildSketch(Plane(origin=(-69.85, 0, 0), x_dir=(1, 0, 0), z_dir=(0, 0, 1))):
        with BuildLine():
            Line((3.2639, -3.175), (3.2639, -8.255))
            ThreePointArc((3.2639, -8.255), (3.635874388, -9.153025612), (4.5339, -9.525))
            Line((4.5339, -9.525), (5.08, -9.525))
            ThreePointArc((5.08, -9.525), (5.978025612, -9.153025612), (6.35, -8.255))
            Line((6.35, -8.255), (6.35, -3.175))
            Line((6.35, -3.175), (3.2639, -3.175))
        make_face()
    revolve(axis=Axis((-69.85, 0, 0), (0, 1, 0)))

    # Sketch21 → Cut-Extrude5 (cut, through all)
    with BuildSketch(Plane(origin=(0, 3.175, 0), x_dir=(1, 0, 0), z_dir=(0, 1, 0))):
        with Locations(Location((0, 37.084, 0), (0, 0, 270))):
            Circle(SKETCH21_R)
        with Locations(Location((0, -37.084, 0), (0, 0, 270))):
            Circle(SKETCH21_R)
    extrude(amount=-CUT_EXTRUDE5_DEPTH, mode=Mode.SUBTRACT)


solid = part.part
